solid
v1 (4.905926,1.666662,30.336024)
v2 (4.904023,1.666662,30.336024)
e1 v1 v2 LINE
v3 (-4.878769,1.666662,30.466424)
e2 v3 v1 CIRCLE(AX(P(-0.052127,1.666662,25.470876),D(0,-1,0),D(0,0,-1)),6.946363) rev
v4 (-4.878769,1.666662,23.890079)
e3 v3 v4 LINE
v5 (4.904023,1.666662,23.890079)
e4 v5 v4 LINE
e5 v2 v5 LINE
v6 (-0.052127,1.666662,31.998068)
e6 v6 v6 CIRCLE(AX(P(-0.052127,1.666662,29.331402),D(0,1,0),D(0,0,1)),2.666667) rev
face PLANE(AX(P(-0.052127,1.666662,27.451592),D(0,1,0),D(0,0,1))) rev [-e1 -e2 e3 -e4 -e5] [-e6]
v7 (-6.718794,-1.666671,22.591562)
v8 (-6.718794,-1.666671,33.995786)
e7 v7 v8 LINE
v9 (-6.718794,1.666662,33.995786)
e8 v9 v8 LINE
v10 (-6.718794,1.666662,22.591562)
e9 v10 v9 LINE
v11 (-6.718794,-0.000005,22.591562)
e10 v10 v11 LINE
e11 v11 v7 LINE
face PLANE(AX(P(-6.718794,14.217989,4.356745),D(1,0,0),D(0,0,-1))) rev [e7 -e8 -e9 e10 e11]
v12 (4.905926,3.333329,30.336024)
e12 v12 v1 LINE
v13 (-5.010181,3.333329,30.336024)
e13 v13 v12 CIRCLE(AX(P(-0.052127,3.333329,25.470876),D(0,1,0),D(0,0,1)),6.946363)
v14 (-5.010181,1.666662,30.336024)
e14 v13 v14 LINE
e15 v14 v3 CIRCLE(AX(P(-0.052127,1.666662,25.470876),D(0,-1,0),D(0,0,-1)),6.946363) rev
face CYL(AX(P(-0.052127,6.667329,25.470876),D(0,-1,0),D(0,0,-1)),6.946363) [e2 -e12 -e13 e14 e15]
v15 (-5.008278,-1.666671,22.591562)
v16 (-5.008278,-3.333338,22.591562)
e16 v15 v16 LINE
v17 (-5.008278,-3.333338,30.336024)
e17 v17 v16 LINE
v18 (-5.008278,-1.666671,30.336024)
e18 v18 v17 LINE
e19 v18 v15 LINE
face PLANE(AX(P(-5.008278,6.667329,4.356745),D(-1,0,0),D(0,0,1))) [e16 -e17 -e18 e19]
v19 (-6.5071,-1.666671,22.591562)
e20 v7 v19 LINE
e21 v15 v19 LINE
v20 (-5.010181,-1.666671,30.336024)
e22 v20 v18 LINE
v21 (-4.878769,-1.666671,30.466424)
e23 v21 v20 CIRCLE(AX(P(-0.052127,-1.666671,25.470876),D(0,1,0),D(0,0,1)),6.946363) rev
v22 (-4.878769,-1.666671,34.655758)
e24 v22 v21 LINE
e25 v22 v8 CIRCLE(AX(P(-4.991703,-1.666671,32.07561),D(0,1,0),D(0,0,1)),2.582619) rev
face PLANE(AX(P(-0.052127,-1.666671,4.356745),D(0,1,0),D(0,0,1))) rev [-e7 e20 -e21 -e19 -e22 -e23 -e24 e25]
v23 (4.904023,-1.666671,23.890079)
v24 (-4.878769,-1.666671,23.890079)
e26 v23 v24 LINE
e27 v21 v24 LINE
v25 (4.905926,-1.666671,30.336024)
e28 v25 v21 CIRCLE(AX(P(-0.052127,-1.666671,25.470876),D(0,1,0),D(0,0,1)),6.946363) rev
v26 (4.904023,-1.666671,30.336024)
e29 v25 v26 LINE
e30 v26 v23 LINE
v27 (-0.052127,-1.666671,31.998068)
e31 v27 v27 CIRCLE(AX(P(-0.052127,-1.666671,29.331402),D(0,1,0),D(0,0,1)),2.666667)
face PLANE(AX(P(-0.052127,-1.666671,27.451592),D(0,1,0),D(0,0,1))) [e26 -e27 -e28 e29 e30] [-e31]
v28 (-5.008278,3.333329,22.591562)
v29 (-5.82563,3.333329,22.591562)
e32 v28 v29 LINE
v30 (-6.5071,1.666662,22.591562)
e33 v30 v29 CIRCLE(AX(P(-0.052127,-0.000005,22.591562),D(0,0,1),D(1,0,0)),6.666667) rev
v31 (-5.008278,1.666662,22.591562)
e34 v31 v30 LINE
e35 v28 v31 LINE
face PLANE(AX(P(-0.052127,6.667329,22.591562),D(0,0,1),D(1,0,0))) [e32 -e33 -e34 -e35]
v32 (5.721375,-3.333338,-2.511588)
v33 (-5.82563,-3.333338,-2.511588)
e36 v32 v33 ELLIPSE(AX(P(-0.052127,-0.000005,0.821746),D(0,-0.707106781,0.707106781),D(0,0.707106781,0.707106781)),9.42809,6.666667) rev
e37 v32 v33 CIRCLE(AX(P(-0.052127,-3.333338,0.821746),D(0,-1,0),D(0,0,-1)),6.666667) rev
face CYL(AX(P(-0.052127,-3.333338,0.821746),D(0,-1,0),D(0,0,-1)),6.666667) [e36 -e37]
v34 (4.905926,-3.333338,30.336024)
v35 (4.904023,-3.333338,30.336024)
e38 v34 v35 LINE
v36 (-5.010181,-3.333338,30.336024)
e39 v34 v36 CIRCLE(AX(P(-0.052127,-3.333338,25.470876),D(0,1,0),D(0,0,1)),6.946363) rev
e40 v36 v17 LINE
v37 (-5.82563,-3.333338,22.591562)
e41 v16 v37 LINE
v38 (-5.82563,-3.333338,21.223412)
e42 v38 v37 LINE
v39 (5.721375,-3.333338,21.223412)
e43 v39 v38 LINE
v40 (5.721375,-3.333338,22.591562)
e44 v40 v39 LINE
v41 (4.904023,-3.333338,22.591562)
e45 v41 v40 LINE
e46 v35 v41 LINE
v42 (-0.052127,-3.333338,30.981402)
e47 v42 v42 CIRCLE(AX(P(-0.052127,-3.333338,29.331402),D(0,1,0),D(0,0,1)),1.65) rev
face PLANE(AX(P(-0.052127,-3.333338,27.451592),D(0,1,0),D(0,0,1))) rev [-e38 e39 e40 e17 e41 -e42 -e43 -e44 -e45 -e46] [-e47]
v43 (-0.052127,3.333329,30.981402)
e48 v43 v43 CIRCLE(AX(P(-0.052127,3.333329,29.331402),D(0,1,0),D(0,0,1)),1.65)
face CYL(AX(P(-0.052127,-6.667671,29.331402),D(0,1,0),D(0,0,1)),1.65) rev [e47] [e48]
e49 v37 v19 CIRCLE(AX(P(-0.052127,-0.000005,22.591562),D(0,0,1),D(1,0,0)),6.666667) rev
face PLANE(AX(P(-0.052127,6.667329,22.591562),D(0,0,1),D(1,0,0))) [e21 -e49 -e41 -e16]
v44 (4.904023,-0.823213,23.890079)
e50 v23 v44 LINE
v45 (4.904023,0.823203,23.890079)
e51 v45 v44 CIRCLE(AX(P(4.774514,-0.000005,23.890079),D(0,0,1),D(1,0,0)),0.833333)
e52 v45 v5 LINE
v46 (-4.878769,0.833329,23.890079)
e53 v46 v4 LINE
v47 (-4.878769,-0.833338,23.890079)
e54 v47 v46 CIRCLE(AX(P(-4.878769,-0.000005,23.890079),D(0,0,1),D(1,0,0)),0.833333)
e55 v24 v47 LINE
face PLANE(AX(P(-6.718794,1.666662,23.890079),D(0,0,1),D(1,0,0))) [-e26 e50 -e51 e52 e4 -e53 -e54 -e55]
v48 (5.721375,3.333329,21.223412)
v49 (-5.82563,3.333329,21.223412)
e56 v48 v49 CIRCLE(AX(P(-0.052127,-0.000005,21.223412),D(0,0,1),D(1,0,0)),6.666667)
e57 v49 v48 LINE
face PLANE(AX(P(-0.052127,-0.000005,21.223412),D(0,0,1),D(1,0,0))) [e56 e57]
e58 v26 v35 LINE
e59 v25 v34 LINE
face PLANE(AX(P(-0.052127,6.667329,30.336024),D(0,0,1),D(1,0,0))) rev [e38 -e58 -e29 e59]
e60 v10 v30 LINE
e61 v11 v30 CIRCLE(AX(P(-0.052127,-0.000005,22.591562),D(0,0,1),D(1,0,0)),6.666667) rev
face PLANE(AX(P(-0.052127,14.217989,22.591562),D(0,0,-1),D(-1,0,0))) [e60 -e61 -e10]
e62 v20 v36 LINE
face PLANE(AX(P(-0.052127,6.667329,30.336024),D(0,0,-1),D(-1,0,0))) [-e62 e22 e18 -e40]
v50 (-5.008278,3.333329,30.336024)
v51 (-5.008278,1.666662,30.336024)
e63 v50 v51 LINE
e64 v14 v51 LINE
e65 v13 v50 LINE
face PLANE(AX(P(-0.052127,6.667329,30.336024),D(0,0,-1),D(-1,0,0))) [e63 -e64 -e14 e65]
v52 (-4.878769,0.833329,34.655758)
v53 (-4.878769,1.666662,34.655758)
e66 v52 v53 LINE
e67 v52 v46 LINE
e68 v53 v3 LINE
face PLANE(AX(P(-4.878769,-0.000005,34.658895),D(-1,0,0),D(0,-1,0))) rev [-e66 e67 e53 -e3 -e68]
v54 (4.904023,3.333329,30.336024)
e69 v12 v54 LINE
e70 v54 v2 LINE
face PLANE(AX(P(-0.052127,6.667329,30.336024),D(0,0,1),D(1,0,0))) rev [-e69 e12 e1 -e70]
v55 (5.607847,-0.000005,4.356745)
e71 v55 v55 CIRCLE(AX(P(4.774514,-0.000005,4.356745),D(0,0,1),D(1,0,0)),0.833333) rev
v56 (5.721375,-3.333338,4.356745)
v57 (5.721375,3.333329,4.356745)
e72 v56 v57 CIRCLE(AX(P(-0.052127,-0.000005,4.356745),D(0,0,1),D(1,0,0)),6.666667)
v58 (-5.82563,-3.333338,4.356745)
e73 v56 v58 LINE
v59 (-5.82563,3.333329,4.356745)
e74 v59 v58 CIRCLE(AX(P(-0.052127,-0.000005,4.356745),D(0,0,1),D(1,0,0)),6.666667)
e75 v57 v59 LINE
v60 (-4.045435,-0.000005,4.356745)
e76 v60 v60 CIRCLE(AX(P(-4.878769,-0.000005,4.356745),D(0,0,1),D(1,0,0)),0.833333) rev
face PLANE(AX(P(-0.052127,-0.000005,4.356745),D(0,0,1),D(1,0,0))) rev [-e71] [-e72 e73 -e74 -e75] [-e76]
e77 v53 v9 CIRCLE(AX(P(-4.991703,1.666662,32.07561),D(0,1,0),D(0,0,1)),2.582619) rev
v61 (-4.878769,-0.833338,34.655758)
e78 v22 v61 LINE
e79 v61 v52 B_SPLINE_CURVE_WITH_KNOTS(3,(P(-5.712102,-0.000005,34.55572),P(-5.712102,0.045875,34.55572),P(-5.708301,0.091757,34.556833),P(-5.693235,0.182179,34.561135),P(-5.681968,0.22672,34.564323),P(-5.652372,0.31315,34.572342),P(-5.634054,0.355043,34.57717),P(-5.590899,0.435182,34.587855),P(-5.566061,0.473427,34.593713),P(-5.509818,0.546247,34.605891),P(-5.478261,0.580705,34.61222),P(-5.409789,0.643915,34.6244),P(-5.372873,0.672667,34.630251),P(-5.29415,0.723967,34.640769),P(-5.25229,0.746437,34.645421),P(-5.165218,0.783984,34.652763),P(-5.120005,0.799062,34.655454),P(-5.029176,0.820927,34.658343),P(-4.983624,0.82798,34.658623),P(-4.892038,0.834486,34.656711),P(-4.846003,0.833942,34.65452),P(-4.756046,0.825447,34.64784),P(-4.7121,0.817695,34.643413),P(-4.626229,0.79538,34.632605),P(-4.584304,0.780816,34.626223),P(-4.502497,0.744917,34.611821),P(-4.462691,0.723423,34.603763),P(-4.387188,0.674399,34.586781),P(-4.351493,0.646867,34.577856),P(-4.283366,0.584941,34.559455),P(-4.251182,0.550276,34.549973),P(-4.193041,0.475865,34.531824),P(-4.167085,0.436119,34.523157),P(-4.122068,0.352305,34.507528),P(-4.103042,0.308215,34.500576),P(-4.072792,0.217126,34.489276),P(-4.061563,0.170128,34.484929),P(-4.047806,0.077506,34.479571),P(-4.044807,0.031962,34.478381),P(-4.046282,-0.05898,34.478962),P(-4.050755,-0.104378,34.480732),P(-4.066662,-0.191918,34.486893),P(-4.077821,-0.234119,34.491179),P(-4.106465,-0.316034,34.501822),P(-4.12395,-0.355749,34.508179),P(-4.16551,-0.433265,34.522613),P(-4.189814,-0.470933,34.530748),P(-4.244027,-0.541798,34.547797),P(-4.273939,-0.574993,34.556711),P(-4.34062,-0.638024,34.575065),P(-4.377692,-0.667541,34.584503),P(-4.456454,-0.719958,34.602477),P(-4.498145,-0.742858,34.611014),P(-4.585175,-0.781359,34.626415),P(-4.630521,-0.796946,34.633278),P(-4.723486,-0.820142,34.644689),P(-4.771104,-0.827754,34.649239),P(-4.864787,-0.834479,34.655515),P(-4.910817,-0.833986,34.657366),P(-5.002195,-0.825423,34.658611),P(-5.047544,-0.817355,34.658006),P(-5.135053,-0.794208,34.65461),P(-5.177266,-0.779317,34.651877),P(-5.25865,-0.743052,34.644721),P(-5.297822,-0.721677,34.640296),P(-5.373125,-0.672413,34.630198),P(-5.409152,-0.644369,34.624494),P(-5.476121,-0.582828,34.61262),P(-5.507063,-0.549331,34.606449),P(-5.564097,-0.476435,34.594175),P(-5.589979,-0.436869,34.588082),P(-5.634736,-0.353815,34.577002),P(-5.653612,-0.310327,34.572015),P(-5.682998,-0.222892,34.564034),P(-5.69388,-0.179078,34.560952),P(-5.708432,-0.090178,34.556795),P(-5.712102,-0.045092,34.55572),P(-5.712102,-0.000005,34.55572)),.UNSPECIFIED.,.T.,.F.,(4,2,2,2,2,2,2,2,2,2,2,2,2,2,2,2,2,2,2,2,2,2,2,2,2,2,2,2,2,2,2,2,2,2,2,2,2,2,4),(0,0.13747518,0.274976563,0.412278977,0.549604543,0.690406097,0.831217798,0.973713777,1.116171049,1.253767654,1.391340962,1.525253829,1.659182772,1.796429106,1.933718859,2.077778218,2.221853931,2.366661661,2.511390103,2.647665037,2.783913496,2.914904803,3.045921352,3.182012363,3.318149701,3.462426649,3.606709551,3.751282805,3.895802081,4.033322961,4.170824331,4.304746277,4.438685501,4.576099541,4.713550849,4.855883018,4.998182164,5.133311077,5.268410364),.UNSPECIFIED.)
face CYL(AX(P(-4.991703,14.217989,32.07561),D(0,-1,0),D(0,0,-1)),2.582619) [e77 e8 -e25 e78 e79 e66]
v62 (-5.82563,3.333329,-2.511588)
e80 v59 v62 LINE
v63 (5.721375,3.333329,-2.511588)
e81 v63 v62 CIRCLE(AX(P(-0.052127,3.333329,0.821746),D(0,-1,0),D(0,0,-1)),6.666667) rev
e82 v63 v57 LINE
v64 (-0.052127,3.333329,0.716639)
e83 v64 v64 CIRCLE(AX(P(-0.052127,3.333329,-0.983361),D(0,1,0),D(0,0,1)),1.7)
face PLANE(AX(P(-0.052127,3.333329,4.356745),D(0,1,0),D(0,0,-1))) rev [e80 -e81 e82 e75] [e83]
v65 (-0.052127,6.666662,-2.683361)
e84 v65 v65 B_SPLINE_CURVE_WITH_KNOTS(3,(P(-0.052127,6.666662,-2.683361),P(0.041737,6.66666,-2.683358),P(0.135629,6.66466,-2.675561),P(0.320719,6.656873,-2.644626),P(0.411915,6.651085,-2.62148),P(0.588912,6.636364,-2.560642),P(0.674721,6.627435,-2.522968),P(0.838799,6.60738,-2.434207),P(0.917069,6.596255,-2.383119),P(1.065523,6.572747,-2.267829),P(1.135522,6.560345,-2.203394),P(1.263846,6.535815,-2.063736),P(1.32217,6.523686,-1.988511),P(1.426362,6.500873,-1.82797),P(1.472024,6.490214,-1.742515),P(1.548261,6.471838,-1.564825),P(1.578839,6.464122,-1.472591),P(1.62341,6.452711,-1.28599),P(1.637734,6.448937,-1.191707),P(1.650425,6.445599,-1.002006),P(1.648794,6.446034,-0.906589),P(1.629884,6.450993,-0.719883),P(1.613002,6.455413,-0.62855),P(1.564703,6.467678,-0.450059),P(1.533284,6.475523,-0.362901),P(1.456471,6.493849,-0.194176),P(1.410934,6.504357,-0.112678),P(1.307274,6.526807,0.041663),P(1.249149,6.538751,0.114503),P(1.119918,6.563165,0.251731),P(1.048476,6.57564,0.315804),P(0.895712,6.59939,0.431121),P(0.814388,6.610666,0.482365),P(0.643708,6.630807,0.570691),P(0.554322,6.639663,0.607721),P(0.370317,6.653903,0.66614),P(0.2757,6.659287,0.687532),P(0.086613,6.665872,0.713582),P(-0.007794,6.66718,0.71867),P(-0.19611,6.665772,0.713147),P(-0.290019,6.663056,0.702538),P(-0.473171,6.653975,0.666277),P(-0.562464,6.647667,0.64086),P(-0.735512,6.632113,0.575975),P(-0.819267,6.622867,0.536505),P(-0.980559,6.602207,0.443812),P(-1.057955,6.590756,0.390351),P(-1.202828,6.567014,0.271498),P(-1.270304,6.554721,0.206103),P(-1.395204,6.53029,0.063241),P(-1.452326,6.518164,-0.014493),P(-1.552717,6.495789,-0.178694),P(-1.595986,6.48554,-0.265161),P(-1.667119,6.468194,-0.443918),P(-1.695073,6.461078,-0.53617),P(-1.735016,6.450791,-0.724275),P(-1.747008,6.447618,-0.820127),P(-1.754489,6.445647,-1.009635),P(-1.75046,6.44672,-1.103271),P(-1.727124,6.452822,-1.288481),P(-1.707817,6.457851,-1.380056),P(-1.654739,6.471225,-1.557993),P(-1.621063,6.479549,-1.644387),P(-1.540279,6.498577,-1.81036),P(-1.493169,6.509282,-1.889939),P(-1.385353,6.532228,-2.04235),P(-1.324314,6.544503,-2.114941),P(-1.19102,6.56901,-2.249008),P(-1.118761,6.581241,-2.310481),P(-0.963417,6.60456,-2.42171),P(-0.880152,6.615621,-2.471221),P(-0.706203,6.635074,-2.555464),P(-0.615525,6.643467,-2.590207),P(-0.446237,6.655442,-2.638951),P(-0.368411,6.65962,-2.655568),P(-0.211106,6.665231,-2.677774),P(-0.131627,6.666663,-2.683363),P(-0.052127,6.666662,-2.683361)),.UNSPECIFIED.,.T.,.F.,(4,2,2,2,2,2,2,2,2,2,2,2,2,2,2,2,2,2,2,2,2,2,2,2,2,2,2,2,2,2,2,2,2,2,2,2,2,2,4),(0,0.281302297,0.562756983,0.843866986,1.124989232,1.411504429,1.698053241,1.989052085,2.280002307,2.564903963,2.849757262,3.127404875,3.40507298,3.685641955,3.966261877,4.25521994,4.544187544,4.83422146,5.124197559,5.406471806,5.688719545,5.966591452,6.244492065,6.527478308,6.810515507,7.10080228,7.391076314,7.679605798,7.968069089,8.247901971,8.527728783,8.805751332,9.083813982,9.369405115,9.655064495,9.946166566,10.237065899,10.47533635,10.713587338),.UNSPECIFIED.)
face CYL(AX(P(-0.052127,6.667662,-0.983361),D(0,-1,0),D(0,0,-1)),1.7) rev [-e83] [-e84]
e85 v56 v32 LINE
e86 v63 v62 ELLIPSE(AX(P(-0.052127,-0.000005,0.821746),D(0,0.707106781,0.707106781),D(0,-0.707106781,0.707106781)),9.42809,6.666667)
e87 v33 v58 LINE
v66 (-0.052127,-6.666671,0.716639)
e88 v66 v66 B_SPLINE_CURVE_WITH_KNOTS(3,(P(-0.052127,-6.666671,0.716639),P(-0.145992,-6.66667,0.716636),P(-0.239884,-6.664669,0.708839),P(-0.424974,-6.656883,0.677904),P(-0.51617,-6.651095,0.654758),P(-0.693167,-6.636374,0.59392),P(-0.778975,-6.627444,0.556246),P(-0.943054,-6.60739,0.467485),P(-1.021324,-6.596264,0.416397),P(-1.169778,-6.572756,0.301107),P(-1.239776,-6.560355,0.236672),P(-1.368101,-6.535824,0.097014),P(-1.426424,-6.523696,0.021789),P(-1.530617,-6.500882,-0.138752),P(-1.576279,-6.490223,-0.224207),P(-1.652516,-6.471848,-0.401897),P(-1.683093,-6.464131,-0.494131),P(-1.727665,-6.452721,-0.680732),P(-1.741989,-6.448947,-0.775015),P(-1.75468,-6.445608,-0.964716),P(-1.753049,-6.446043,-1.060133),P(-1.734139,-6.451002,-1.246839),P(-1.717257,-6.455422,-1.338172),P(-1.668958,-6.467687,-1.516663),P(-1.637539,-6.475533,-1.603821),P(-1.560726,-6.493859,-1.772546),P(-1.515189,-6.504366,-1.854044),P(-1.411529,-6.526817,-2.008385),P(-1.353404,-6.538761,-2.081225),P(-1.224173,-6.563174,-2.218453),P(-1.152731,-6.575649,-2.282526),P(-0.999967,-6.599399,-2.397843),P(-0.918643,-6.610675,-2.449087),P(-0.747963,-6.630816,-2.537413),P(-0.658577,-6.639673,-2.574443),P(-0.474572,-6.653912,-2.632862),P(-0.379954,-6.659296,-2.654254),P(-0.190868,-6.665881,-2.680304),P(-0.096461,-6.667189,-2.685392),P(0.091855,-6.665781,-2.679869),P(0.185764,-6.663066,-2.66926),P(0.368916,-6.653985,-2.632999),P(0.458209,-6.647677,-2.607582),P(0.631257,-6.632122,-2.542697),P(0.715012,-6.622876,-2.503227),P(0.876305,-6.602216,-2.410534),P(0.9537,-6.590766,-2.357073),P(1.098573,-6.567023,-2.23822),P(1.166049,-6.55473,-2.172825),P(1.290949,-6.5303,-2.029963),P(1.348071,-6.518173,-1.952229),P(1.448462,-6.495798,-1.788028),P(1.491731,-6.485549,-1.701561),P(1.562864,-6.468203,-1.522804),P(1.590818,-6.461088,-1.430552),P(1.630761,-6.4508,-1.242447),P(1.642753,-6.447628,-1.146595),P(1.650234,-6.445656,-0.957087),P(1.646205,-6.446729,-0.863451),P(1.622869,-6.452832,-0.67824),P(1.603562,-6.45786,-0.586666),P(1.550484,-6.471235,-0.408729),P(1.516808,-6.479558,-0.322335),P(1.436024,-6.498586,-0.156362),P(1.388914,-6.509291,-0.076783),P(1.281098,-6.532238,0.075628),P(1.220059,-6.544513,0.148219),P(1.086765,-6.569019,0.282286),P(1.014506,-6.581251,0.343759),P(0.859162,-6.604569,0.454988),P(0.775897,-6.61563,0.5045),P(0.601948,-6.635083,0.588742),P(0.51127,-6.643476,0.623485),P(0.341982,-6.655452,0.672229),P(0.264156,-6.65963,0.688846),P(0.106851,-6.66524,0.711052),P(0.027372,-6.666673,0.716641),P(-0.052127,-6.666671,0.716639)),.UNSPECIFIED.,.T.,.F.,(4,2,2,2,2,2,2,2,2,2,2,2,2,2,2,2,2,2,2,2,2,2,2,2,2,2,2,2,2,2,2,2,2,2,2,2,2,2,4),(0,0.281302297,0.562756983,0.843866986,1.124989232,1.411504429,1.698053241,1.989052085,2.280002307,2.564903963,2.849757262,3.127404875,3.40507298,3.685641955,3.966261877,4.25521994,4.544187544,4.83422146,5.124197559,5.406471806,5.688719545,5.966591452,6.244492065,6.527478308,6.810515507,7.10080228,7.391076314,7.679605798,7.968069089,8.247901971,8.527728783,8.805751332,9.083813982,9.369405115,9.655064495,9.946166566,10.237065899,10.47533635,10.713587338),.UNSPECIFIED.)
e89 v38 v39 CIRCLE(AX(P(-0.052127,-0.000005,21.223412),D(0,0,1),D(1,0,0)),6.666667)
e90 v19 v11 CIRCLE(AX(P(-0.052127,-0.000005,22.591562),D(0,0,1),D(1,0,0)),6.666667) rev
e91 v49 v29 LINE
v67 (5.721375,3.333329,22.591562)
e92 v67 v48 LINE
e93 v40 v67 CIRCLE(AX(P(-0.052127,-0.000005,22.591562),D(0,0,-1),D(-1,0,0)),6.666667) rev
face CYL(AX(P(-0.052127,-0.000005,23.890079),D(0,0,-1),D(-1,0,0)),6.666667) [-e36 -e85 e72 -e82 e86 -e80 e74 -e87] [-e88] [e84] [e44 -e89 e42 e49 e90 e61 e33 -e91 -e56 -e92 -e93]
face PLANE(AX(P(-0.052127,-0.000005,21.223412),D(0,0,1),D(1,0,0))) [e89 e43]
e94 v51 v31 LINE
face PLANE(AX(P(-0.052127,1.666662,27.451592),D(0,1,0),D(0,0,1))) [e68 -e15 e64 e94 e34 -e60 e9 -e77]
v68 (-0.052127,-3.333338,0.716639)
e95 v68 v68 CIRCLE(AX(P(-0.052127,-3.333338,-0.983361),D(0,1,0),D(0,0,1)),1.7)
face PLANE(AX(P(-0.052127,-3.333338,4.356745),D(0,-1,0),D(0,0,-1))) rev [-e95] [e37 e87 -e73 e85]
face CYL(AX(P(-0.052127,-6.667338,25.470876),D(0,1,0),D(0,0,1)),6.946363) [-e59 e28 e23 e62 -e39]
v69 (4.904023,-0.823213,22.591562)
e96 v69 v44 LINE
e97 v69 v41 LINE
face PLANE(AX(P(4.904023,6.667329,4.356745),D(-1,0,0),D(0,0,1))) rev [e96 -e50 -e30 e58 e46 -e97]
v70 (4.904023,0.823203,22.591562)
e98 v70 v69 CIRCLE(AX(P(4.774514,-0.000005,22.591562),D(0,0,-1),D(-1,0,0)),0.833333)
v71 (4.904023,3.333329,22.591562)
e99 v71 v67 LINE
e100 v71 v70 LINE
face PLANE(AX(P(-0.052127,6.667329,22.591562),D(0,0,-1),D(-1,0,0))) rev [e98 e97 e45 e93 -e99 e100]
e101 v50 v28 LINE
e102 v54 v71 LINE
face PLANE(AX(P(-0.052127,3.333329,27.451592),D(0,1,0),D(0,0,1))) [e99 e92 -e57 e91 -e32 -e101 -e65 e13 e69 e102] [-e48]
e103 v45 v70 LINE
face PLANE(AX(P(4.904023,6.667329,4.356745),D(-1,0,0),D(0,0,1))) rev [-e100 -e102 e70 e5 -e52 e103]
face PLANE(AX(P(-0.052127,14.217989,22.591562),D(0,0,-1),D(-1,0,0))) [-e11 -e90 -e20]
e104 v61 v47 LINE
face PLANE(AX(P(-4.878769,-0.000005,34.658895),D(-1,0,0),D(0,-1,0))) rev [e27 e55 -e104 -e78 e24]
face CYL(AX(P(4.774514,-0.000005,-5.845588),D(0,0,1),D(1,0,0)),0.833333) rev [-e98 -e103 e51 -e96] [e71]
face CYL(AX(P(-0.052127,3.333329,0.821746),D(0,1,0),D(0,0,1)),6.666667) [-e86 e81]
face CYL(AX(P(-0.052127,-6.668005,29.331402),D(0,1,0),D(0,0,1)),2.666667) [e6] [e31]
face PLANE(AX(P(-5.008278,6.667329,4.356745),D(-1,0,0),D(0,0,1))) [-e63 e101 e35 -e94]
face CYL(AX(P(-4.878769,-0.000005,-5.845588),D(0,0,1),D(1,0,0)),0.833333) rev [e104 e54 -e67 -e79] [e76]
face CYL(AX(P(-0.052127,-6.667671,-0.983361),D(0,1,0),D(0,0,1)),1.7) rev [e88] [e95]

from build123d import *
from build123d.topology import SkipClean

# Parameters (mm, degrees)
SKETCH2_R                       = 10
PHALANGE_LENGTH_DEPTH           = 29.3
BOSS_EXTRUDE3_DEPTH             = 5
BOSS_EXTRUDE4_DEPTH             = 5
BOSS_EXTRUDE4_DEPTH_BACK        = 5
CUT_EXTRUDE2_START              = -15.3025
CUT_EXTRUDE2_DEPTH              = 15.3025
SKETCH7_R                       = 1.65
CUT_EXTRUDE3_DEPTH              = 10
CUT_EXTRUDE4_DEPTH              = 2.5
CUT_EXTRUDE4_DEPTH_BACK         = 2.5
CUT_EXTRUDE7_REACH              = 50.154
SKETCH4_R                       = 1.65
CUT_EXTRUDE7_DIRECTION_2_REACH  = 50.154
CUT_EXTRUDE_THIN1_START         = 29.3
CUT_EXTRUDE_THIN1_DEPTH         = 10.361670454
BOSS_EXTRUDE5_REACH             = 49.435
SKETCH9_R                       = 4
SKETCH9_R_2                     = 1.65
CUT_EXTRUDE8_REACH              = 48.791
SKETCH10_R                      = 1.25
CUT_EXTRUDE9_START              = -4
CUT_EXTRUDE9_DEPTH              = 4
CUT_EXTRUDE10_REACH             = 49.435
CUT_EXTRUDE10_DIRECTION_2_REACH = 49.435
CUT_EXTRUDE11_START             = -10
CUT_EXTRUDE11_OUTLINE_W         = 2.565773848
CUT_EXTRUDE11_OUTLINE_H         = 11.6166929
CUT_EXTRUDE11_DEPTH             = 10
BOSS_EXTRUDE7_REACH             = 47.032
CUT_EXTRUDE12_REACH             = 48.791
SKETCH10_2_R                    = 1.25
CUT_EXTRUDE12_DIRECTION_2_REACH = 48.791
SKETCH17_R                      = 1.25
SKETCH17_W                      = 2.42123439
SKETCH17_H                      = 5
CUT_EXTRUDE14_DEPTH             = 16.148519
SCALE1_SCALE                    = 0.666666667
CUT_EXTRUDE15_START             = -10
SKETCH18_R                      = 1.65
CUT_EXTRUDE15_DEPTH             = 13.333338
CUT_EXTRUDE16_START             = -3.333333
SKETCH19_R                      = 1.7
CUT_EXTRUDE16_DEPTH             = 13.333338


# Read off the part's stored shape, not the designer's step: Cut-Extrude-Thin1, Cut-Extrude11
with BuildPart() as part:
    # Sketch2 → Phalange Length (new body)
    with BuildSketch(Plane.XY):
        Circle(SKETCH2_R)
    extrude(amount=PHALANGE_LENGTH_DEPTH)

    # Sketch3 → Boss-Extrude3 (add)
    with BuildSketch(Plane(origin=(0, -10, 0), x_dir=(-1, 0, 0), z_dir=(0, -1, 0))):
        with BuildLine():
            Line((-10, 5.302499701), (-10, 0))
            Line((-10, 0), (10, 0))
            Line((10, 0), (10, 5.302499701))
            ThreePointArc((10, 5.302499701), (0, 15.302499701), (-10, 5.302499701))
        make_face()
    boss_extrude3 = extrude(amount=-BOSS_EXTRUDE3_DEPTH)

    # Mirror1: Boss-Extrude3 across plane
    add(boss_extrude3.mirror(Plane.ZX))

    # Sketch5 → Boss-Extrude4 (add, two sides: drawn at the far end of the back side and taken through both)
    with BuildSketch(Plane(origin=(0, 0, 0), x_dir=(1, 0, 0), z_dir=(0, 1, 0)).offset(-BOSS_EXTRUDE4_DEPTH_BACK)):
        with BuildLine():
            Line((-10, -35.083157911), (-10, -29.3))
            Line((-10, -29.3), (10, -29.3))
            Line((10, -29.3), (10, -35.083157911))
            ThreePointArc((10, -35.083157911), (0, -44.651984156), (-10, -35.083157911))
        make_face()
    extrude(amount=BOSS_EXTRUDE4_DEPTH + BOSS_EXTRUDE4_DEPTH_BACK)

    # Sketch6 → Cut-Extrude2 (cut)
    with SkipClean():  # the faces are left unmerged after this step: merging them gives an invalid solid
        with BuildSketch(Plane.XY.offset(CUT_EXTRUDE2_START)):
            with BuildLine():
                ThreePointArc((0, 10), (5, 8.660254038), (8.660254038, 5))
                Line((8.660254038, 5), (10, 5))
                Line((10, 5), (10, 10))
                Line((10, 10), (0, 10))
            make_face()
            with BuildLine():
                Line((10, -5), (8.660254038, -5))
                ThreePointArc((8.660254038, -5), (5, -8.660254038), (0, -10))
                Line((0, -10), (10, -10))
                Line((10, -10), (10, -5))
            make_face()
            with BuildLine():
                ThreePointArc((-8.660254038, 5), (-5, 8.660254038), (0, 10))
                Line((0, 10), (-10, 10))
                Line((-10, 10), (-10, 5))
                Line((-10, 5), (-8.660254038, 5))
            make_face()
            with BuildLine():
                Line((-10, -10), (0, -10))
                ThreePointArc((0, -10), (-5, -8.660254038), (-8.660254038, -5))
                Line((-8.660254038, -5), (-10, -5))
                Line((-10, -5), (-10, -10))
            make_face()
        extrude(amount=CUT_EXTRUDE2_DEPTH, mode=Mode.SUBTRACT)

    # Sketch7 → Cut-Extrude3 (cut)
    with SkipClean():  # the faces are left unmerged after this step: merging them gives an invalid solid
        with BuildSketch(Plane(origin=(0, 5, 0), x_dir=(1, 0, 0), z_dir=(0, 1, 0))):
            with Locations(Location((0, -37.461984156, 0), (0, 0, 270))):
                Circle(SKETCH7_R)
        extrude(amount=-CUT_EXTRUDE3_DEPTH, mode=Mode.SUBTRACT)

    # Sketch5<2> → Cut-Extrude4 (cut, two sides: drawn at the far end of the back side and taken through both)
    with BuildSketch(Plane(origin=(0, 0, 0), x_dir=(1, 0, 0), z_dir=(0, 1, 0)).offset(-CUT_EXTRUDE4_DEPTH_BACK)):
        with BuildLine():
            Line((-10, -35.083157911), (-10, -29.3))
            Line((-10, -29.3), (10, -29.3))
            Line((10, -29.3), (10, -35.083157911))
            ThreePointArc((10, -35.083157911), (0, -44.651984156), (-10, -35.083157911))
        make_face()
    extrude(amount=CUT_EXTRUDE4_DEPTH + CUT_EXTRUDE4_DEPTH_BACK, mode=Mode.SUBTRACT)

    # Sketch4 → Cut-Extrude7 (cut, up to next)
    with BuildSketch(Plane(origin=(0, -5, 0), x_dir=(1, 0, 0), z_dir=(0, 1, 0)), mode=Mode.PRIVATE) as cut_extrude7_sk1:
        with Locations(Location((0, 8.010159673, 0), (0, 0, 270))):
            Circle(SKETCH4_R)
    cut_extrude7_tool1 = extrude(cut_extrude7_sk1.sketch, amount=-CUT_EXTRUDE7_REACH, mode=Mode.PRIVATE) & part.part
    add(cut_extrude7_tool1.solids().sort_by_distance((0, -5, -8.01016))[0], mode=Mode.SUBTRACT)

    # Sketch4 → Cut-Extrude7 direction 2 (cut, up to next)
    with BuildSketch(Plane(origin=(0, -5, 0), x_dir=(1, 0, 0), z_dir=(0, 1, 0)), mode=Mode.PRIVATE) as cut_extrude7_direction_2_sk1:
        with Locations(Location((0, 8.010159673, 0), (0, 0, 270))):
            Circle(SKETCH4_R)
    cut_extrude7_direction_2_tool1 = extrude(cut_extrude7_direction_2_sk1.sketch, amount=CUT_EXTRUDE7_DIRECTION_2_REACH, mode=Mode.PRIVATE) & part.part
    add(cut_extrude7_direction_2_tool1.solids().sort_by_distance((0, -5, -8.01016))[0], mode=Mode.SUBTRACT)

    # Cut-Extrude-Thin1 outline → Cut-Extrude-Thin1 (cut)
    with SkipClean():  # the faces are left unmerged after this step: merging them gives an invalid solid
        with BuildSketch(Plane.XY.offset(CUT_EXTRUDE_THIN1_START)):
            with BuildLine():
                ThreePointArc((8.660254038, 5), (9.256147934, 3.78466979), (9.682458366, 2.5))
                Line((9.682458366, 2.5), (10, 2.5))
                Line((10, 2.5), (10, 5))
                Line((10, 5), (8.660254038, 5))
            make_face()
            with BuildLine():
                Line((10, -2.5), (9.682458366, -2.5))
                ThreePointArc((9.682458366, -2.5), (9.256147934, -3.78466979), (8.660254038, -5))
                Line((8.660254038, -5), (10, -5))
                Line((10, -5), (10, -2.5))
            make_face()
            with BuildLine():
                Line((-10, 2.5), (-9.682458366, 2.5))
                ThreePointArc((-9.682458366, 2.5), (-9.256147934, 3.78466979), (-8.660254038, 5))
                Line((-8.660254038, 5), (-10, 5))
                Line((-10, 5), (-10, 2.5))
            make_face()
            with BuildLine():
                ThreePointArc((-8.660254038, -5), (-9.256147934, -3.78466979), (-9.682458366, -2.5))
                Line((-9.682458366, -2.5), (-10, -2.5))
                Line((-10, -2.5), (-10, -5))
                Line((-10, -5), (-8.660254038, -5))
            make_face()
        extrude(amount=CUT_EXTRUDE_THIN1_DEPTH, mode=Mode.SUBTRACT)

    # Sketch9 → Boss-Extrude5 (add, up to next)
    with BuildSketch(Plane.XZ.offset(-2.5), mode=Mode.PRIVATE) as boss_extrude5_sk1:
        with Locations(Location((0, 37.461984156, 0), (0, 0, 90))):
            Circle(SKETCH9_R)
        with Locations(Location((0, 37.461984156, 0), (0, 0, 90))):
            Circle(SKETCH9_R_2, mode=Mode.SUBTRACT)
    boss_extrude5_tool1 = extrude(boss_extrude5_sk1.sketch, amount=BOSS_EXTRUDE5_REACH, mode=Mode.PRIVATE) - part.part
    add(boss_extrude5_tool1.solids().sort_by_distance((0, 2.5, 33.575121))[0])

    # Sketch10 → Cut-Extrude8 (cut, up to next)
    with BuildSketch(Plane.XY.offset(29.3), mode=Mode.PRIVATE) as cut_extrude8_sk1:
        with Locations((7.239961745, 0)):
            Circle(SKETCH10_R)
    cut_extrude8_tool1 = extrude(cut_extrude8_sk1.sketch, amount=-CUT_EXTRUDE8_REACH, mode=Mode.PRIVATE) & part.part
    # Sketch10 → Cut-Extrude8 (cut, up to next)
    with BuildSketch(Plane.XY.offset(29.3), mode=Mode.PRIVATE) as cut_extrude8_sk2:
        with Locations((-7.239961745, 0)):
            Circle(SKETCH10_R)
    cut_extrude8_tool2 = extrude(cut_extrude8_sk2.sketch, amount=-CUT_EXTRUDE8_REACH, mode=Mode.PRIVATE) & part.part
    add(cut_extrude8_tool1.solids().sort_by_distance((7.239962, 0, 29.3))[0], mode=Mode.SUBTRACT)
    add(cut_extrude8_tool2.solids().sort_by_distance((-7.239962, 0, 29.3))[0], mode=Mode.SUBTRACT)

    # Sketch11 → Cut-Extrude9 (cut)
    with SkipClean():  # the faces are left unmerged after this step: merging them gives an invalid solid
        with BuildSketch(Plane.XY.offset(29.3).offset(CUT_EXTRUDE9_START)):
            with BuildLine():
                ThreePointArc((8.660254038, 5), (0, 10), (-8.660254038, 5))
                Line((-8.660254038, 5), (8.660254038, 5))
            make_face()
            with BuildLine():
                Line((8.660254038, -5), (-8.660254038, -5))
                ThreePointArc((-8.660254038, -5), (0, -10), (8.660254038, -5))
            make_face()
        extrude(amount=CUT_EXTRUDE9_DEPTH, mode=Mode.SUBTRACT)

    # Sketch12 → Cut-Extrude10 (cut, up to next)
    with BuildSketch(Plane.XZ.offset(-2.5), mode=Mode.PRIVATE) as cut_extrude10_sk1:
        with BuildLine():
            Line((-10.033719202, 44.651984156), (-10.033719202, 37.464892021))
            Line((-10.033719202, 37.464892021), (-8.660254038, 37.464892021))
            ThreePointArc((-8.660254038, 37.464892021), (0, 42.090740593), (8.660254038, 37.464892021))
            Line((8.660254038, 37.464892021), (10.033719202, 37.464892021))
            Line((10.033719202, 37.464892021), (10.033719202, 44.651984156))
            Line((10.033719202, 44.651984156), (-10.033719202, 44.651984156))
        make_face()
    cut_extrude10_tool1 = extrude(cut_extrude10_sk1.sketch, amount=CUT_EXTRUDE10_REACH, mode=Mode.PRIVATE) & part.part
    add(cut_extrude10_tool1.solids().sort_by_distance((0, 2.5, 42.150279))[0], mode=Mode.SUBTRACT)

    # Sketch12 → Cut-Extrude10 direction 2 (cut, up to next)
    with BuildSketch(Plane.XZ.offset(-2.5), mode=Mode.PRIVATE) as cut_extrude10_direction_2_sk1:
        with BuildLine():
            Line((-10.033719202, 44.651984156), (-10.033719202, 37.464892021))
            Line((-10.033719202, 37.464892021), (-8.660254038, 37.464892021))
            ThreePointArc((-8.660254038, 37.464892021), (0, 42.090740593), (8.660254038, 37.464892021))
            Line((8.660254038, 37.464892021), (10.033719202, 37.464892021))
            Line((10.033719202, 37.464892021), (10.033719202, 44.651984156))
            Line((10.033719202, 44.651984156), (-10.033719202, 44.651984156))
        make_face()
    cut_extrude10_direction_2_tool1 = extrude(cut_extrude10_direction_2_sk1.sketch, amount=-CUT_EXTRUDE10_DIRECTION_2_REACH, mode=Mode.PRIVATE) & part.part
    add(cut_extrude10_direction_2_tool1.solids().sort_by_distance((0, 2.5, 42.150279))[0], mode=Mode.SUBTRACT)

    # Cut-Extrude11 outline → Cut-Extrude11 (cut)
    with BuildSketch(Plane.XZ.offset(5).offset(CUT_EXTRUDE11_START)):
        with Locations((-8.717113076, 33.160571369)):
            Rectangle(CUT_EXTRUDE11_OUTLINE_W, CUT_EXTRUDE11_OUTLINE_H)
        with Locations((8.717113076, 33.160571369)):
            Rectangle(CUT_EXTRUDE11_OUTLINE_W, CUT_EXTRUDE11_OUTLINE_H)
    extrude(amount=CUT_EXTRUDE11_DEPTH, mode=Mode.SUBTRACT)

    # Boss-Extrude7: up to this face of the body (flat: up to its plane)
    boss_extrude7_end = Plane(part.part.faces().sort_by_distance((0, 2.5, 29.496174341))[0])
    # Sketch16 → Boss-Extrude7 (add, up to the picked face)
    with BuildSketch(Plane(origin=(0, -2.5, 0), x_dir=(1, 0, 0), z_dir=(0, 1, 0)), mode=Mode.PRIVATE) as boss_extrude7_sk1:
        with BuildLine():
            Line((-4.818727355, -27.352224919), (-7.434226152, -27.352224919))
            Line((-7.434226152, -27.352224919), (-10, -27.352224919))
            Line((-10, -27.352224919), (-10, -44.458561033))
            ThreePointArc((-10, -44.458561033), (-8.808295471, -45.190817912), (-7.43422564, -45.452145139))
            ThreePointArc((-7.43422564, -45.452145139), (-6.033645007, -45.199721533), (-4.818727355, -44.458561033))
            Line((-4.818727355, -44.458561033), (-4.818727355, -40.909527951))
            ThreePointArc((-4.818727355, -40.909527951), (-6.204248493, -40.042230104), (-7.437080645, -38.968917819))
            Line((-7.437080645, -38.968917819), (-7.434226152, -38.968917819))
            Line((-7.434226152, -38.968917819), (-7.434226152, -29.3))
            Line((-7.434226152, -29.3), (-4.818727355, -29.3))
            Line((-4.818727355, -29.3), (-4.818727355, -27.352224919))
        make_face()
    boss_extrude7_tool1 = split(extrude(boss_extrude7_sk1.sketch, amount=BOSS_EXTRUDE7_REACH, mode=Mode.PRIVATE), bisect_by=boss_extrude7_end, keep=Keep.BOTH, mode=Mode.PRIVATE)
    # Sketch16 → Boss-Extrude7 (add, up to the picked face)
    with BuildSketch(Plane(origin=(0, -2.5, 0), x_dir=(1, 0, 0), z_dir=(0, 1, 0)), mode=Mode.PRIVATE) as boss_extrude7_sk2:
        with BuildLine():
            Line((-4.818727355, -40.909527951), (-4.818727355, -29.3))
            Line((-4.818727355, -29.3), (-7.434226152, -29.3))
            Line((-7.434226152, -29.3), (-7.434226152, -38.968917819))
            Line((-7.434226152, -38.968917819), (-7.437080645, -38.968917819))
            ThreePointArc((-7.437080645, -38.968917819), (-6.204248493, -40.042230104), (-4.818727355, -40.909527951))
        make_face()
    boss_extrude7_tool2 = split(extrude(boss_extrude7_sk2.sketch, amount=BOSS_EXTRUDE7_REACH, mode=Mode.PRIVATE), bisect_by=boss_extrude7_end, keep=Keep.BOTH, mode=Mode.PRIVATE)
    add(boss_extrude7_tool1.solids().sort_by(Axis((-7.989429, -2.5, 36.933344), (0, 1, 0)))[0])
    add(boss_extrude7_tool2.solids().sort_by(Axis((-6.08748, -2.5, 34.6879), (0, 1, 0)))[0])

    # Sketch10<2> → Cut-Extrude12 (cut, up to next)
    with BuildSketch(Plane.XY.offset(29.3), mode=Mode.PRIVATE) as cut_extrude12_sk1:
        with Locations((-7.239961745, 0)):
            Circle(SKETCH10_2_R)
    cut_extrude12_tool1 = extrude(cut_extrude12_sk1.sketch, amount=CUT_EXTRUDE12_REACH, mode=Mode.PRIVATE) & part.part
    add(cut_extrude12_tool1.solids().sort_by_distance((-7.239962, 0, 29.3))[0], mode=Mode.SUBTRACT)

    # Sketch10<2> → Cut-Extrude12 direction 2 (cut, up to next)
    with BuildSketch(Plane.XY.offset(29.3), mode=Mode.PRIVATE) as cut_extrude12_direction_2_sk1:
        with Locations((-7.239961745, 0)):
            Circle(SKETCH10_2_R)
    cut_extrude12_direction_2_tool1 = extrude(cut_extrude12_direction_2_sk1.sketch, amount=-CUT_EXTRUDE12_DIRECTION_2_REACH, mode=Mode.PRIVATE) & part.part
    add(cut_extrude12_direction_2_tool1.solids().sort_by_distance((-7.239962, 0, 29.3))[0], mode=Mode.SUBTRACT)

    # Sketch17 → Cut-Extrude14 (cut)
    with SkipClean():  # the faces are left unmerged after this step: merging them gives an invalid solid
        with BuildSketch(Plane.XY.offset(29.3)):
            with Locations((-7.239961745, 0)):
                Circle(SKETCH17_R)
            with Locations((-6.02934455, 0)):
                Rectangle(SKETCH17_W, SKETCH17_H)
        extrude(amount=CUT_EXTRUDE14_DEPTH, mode=Mode.SUBTRACT)


with BuildPart() as part_1:
    # Scale1: scaled about (-0.156357219, -1.47e-07, 13.069731507)
    add(part.part.scale(SCALE1_SCALE).moved(Location((-0.052119073, -4.9e-08, 4.356577169))))

    # Sketch18 → Cut-Extrude15 (cut)
    with BuildSketch(Plane(origin=(0, 3.333328625, 0), x_dir=(1, 0, 0), z_dir=(0, 1, 0)).offset(CUT_EXTRUDE15_START)):
        with Locations(Location((-0.052127481, -29.331401561, 0), (0, 0, 270))):
            Circle(SKETCH18_R)
    extrude(amount=CUT_EXTRUDE15_DEPTH, mode=Mode.SUBTRACT)

    # Sketch19 → Cut-Extrude16 (cut)
    with BuildSketch(Plane(origin=(0, -3.333338042, 0), x_dir=(1, 0, 0), z_dir=(0, 1, 0)).offset(CUT_EXTRUDE16_START)):
        with Locations(Location((-0.052127481, 0.983360992, 0), (0, 0, 90))):
            Circle(SKETCH19_R)
    extrude(amount=CUT_EXTRUDE16_DEPTH, mode=Mode.SUBTRACT)


solid = part_1.part
